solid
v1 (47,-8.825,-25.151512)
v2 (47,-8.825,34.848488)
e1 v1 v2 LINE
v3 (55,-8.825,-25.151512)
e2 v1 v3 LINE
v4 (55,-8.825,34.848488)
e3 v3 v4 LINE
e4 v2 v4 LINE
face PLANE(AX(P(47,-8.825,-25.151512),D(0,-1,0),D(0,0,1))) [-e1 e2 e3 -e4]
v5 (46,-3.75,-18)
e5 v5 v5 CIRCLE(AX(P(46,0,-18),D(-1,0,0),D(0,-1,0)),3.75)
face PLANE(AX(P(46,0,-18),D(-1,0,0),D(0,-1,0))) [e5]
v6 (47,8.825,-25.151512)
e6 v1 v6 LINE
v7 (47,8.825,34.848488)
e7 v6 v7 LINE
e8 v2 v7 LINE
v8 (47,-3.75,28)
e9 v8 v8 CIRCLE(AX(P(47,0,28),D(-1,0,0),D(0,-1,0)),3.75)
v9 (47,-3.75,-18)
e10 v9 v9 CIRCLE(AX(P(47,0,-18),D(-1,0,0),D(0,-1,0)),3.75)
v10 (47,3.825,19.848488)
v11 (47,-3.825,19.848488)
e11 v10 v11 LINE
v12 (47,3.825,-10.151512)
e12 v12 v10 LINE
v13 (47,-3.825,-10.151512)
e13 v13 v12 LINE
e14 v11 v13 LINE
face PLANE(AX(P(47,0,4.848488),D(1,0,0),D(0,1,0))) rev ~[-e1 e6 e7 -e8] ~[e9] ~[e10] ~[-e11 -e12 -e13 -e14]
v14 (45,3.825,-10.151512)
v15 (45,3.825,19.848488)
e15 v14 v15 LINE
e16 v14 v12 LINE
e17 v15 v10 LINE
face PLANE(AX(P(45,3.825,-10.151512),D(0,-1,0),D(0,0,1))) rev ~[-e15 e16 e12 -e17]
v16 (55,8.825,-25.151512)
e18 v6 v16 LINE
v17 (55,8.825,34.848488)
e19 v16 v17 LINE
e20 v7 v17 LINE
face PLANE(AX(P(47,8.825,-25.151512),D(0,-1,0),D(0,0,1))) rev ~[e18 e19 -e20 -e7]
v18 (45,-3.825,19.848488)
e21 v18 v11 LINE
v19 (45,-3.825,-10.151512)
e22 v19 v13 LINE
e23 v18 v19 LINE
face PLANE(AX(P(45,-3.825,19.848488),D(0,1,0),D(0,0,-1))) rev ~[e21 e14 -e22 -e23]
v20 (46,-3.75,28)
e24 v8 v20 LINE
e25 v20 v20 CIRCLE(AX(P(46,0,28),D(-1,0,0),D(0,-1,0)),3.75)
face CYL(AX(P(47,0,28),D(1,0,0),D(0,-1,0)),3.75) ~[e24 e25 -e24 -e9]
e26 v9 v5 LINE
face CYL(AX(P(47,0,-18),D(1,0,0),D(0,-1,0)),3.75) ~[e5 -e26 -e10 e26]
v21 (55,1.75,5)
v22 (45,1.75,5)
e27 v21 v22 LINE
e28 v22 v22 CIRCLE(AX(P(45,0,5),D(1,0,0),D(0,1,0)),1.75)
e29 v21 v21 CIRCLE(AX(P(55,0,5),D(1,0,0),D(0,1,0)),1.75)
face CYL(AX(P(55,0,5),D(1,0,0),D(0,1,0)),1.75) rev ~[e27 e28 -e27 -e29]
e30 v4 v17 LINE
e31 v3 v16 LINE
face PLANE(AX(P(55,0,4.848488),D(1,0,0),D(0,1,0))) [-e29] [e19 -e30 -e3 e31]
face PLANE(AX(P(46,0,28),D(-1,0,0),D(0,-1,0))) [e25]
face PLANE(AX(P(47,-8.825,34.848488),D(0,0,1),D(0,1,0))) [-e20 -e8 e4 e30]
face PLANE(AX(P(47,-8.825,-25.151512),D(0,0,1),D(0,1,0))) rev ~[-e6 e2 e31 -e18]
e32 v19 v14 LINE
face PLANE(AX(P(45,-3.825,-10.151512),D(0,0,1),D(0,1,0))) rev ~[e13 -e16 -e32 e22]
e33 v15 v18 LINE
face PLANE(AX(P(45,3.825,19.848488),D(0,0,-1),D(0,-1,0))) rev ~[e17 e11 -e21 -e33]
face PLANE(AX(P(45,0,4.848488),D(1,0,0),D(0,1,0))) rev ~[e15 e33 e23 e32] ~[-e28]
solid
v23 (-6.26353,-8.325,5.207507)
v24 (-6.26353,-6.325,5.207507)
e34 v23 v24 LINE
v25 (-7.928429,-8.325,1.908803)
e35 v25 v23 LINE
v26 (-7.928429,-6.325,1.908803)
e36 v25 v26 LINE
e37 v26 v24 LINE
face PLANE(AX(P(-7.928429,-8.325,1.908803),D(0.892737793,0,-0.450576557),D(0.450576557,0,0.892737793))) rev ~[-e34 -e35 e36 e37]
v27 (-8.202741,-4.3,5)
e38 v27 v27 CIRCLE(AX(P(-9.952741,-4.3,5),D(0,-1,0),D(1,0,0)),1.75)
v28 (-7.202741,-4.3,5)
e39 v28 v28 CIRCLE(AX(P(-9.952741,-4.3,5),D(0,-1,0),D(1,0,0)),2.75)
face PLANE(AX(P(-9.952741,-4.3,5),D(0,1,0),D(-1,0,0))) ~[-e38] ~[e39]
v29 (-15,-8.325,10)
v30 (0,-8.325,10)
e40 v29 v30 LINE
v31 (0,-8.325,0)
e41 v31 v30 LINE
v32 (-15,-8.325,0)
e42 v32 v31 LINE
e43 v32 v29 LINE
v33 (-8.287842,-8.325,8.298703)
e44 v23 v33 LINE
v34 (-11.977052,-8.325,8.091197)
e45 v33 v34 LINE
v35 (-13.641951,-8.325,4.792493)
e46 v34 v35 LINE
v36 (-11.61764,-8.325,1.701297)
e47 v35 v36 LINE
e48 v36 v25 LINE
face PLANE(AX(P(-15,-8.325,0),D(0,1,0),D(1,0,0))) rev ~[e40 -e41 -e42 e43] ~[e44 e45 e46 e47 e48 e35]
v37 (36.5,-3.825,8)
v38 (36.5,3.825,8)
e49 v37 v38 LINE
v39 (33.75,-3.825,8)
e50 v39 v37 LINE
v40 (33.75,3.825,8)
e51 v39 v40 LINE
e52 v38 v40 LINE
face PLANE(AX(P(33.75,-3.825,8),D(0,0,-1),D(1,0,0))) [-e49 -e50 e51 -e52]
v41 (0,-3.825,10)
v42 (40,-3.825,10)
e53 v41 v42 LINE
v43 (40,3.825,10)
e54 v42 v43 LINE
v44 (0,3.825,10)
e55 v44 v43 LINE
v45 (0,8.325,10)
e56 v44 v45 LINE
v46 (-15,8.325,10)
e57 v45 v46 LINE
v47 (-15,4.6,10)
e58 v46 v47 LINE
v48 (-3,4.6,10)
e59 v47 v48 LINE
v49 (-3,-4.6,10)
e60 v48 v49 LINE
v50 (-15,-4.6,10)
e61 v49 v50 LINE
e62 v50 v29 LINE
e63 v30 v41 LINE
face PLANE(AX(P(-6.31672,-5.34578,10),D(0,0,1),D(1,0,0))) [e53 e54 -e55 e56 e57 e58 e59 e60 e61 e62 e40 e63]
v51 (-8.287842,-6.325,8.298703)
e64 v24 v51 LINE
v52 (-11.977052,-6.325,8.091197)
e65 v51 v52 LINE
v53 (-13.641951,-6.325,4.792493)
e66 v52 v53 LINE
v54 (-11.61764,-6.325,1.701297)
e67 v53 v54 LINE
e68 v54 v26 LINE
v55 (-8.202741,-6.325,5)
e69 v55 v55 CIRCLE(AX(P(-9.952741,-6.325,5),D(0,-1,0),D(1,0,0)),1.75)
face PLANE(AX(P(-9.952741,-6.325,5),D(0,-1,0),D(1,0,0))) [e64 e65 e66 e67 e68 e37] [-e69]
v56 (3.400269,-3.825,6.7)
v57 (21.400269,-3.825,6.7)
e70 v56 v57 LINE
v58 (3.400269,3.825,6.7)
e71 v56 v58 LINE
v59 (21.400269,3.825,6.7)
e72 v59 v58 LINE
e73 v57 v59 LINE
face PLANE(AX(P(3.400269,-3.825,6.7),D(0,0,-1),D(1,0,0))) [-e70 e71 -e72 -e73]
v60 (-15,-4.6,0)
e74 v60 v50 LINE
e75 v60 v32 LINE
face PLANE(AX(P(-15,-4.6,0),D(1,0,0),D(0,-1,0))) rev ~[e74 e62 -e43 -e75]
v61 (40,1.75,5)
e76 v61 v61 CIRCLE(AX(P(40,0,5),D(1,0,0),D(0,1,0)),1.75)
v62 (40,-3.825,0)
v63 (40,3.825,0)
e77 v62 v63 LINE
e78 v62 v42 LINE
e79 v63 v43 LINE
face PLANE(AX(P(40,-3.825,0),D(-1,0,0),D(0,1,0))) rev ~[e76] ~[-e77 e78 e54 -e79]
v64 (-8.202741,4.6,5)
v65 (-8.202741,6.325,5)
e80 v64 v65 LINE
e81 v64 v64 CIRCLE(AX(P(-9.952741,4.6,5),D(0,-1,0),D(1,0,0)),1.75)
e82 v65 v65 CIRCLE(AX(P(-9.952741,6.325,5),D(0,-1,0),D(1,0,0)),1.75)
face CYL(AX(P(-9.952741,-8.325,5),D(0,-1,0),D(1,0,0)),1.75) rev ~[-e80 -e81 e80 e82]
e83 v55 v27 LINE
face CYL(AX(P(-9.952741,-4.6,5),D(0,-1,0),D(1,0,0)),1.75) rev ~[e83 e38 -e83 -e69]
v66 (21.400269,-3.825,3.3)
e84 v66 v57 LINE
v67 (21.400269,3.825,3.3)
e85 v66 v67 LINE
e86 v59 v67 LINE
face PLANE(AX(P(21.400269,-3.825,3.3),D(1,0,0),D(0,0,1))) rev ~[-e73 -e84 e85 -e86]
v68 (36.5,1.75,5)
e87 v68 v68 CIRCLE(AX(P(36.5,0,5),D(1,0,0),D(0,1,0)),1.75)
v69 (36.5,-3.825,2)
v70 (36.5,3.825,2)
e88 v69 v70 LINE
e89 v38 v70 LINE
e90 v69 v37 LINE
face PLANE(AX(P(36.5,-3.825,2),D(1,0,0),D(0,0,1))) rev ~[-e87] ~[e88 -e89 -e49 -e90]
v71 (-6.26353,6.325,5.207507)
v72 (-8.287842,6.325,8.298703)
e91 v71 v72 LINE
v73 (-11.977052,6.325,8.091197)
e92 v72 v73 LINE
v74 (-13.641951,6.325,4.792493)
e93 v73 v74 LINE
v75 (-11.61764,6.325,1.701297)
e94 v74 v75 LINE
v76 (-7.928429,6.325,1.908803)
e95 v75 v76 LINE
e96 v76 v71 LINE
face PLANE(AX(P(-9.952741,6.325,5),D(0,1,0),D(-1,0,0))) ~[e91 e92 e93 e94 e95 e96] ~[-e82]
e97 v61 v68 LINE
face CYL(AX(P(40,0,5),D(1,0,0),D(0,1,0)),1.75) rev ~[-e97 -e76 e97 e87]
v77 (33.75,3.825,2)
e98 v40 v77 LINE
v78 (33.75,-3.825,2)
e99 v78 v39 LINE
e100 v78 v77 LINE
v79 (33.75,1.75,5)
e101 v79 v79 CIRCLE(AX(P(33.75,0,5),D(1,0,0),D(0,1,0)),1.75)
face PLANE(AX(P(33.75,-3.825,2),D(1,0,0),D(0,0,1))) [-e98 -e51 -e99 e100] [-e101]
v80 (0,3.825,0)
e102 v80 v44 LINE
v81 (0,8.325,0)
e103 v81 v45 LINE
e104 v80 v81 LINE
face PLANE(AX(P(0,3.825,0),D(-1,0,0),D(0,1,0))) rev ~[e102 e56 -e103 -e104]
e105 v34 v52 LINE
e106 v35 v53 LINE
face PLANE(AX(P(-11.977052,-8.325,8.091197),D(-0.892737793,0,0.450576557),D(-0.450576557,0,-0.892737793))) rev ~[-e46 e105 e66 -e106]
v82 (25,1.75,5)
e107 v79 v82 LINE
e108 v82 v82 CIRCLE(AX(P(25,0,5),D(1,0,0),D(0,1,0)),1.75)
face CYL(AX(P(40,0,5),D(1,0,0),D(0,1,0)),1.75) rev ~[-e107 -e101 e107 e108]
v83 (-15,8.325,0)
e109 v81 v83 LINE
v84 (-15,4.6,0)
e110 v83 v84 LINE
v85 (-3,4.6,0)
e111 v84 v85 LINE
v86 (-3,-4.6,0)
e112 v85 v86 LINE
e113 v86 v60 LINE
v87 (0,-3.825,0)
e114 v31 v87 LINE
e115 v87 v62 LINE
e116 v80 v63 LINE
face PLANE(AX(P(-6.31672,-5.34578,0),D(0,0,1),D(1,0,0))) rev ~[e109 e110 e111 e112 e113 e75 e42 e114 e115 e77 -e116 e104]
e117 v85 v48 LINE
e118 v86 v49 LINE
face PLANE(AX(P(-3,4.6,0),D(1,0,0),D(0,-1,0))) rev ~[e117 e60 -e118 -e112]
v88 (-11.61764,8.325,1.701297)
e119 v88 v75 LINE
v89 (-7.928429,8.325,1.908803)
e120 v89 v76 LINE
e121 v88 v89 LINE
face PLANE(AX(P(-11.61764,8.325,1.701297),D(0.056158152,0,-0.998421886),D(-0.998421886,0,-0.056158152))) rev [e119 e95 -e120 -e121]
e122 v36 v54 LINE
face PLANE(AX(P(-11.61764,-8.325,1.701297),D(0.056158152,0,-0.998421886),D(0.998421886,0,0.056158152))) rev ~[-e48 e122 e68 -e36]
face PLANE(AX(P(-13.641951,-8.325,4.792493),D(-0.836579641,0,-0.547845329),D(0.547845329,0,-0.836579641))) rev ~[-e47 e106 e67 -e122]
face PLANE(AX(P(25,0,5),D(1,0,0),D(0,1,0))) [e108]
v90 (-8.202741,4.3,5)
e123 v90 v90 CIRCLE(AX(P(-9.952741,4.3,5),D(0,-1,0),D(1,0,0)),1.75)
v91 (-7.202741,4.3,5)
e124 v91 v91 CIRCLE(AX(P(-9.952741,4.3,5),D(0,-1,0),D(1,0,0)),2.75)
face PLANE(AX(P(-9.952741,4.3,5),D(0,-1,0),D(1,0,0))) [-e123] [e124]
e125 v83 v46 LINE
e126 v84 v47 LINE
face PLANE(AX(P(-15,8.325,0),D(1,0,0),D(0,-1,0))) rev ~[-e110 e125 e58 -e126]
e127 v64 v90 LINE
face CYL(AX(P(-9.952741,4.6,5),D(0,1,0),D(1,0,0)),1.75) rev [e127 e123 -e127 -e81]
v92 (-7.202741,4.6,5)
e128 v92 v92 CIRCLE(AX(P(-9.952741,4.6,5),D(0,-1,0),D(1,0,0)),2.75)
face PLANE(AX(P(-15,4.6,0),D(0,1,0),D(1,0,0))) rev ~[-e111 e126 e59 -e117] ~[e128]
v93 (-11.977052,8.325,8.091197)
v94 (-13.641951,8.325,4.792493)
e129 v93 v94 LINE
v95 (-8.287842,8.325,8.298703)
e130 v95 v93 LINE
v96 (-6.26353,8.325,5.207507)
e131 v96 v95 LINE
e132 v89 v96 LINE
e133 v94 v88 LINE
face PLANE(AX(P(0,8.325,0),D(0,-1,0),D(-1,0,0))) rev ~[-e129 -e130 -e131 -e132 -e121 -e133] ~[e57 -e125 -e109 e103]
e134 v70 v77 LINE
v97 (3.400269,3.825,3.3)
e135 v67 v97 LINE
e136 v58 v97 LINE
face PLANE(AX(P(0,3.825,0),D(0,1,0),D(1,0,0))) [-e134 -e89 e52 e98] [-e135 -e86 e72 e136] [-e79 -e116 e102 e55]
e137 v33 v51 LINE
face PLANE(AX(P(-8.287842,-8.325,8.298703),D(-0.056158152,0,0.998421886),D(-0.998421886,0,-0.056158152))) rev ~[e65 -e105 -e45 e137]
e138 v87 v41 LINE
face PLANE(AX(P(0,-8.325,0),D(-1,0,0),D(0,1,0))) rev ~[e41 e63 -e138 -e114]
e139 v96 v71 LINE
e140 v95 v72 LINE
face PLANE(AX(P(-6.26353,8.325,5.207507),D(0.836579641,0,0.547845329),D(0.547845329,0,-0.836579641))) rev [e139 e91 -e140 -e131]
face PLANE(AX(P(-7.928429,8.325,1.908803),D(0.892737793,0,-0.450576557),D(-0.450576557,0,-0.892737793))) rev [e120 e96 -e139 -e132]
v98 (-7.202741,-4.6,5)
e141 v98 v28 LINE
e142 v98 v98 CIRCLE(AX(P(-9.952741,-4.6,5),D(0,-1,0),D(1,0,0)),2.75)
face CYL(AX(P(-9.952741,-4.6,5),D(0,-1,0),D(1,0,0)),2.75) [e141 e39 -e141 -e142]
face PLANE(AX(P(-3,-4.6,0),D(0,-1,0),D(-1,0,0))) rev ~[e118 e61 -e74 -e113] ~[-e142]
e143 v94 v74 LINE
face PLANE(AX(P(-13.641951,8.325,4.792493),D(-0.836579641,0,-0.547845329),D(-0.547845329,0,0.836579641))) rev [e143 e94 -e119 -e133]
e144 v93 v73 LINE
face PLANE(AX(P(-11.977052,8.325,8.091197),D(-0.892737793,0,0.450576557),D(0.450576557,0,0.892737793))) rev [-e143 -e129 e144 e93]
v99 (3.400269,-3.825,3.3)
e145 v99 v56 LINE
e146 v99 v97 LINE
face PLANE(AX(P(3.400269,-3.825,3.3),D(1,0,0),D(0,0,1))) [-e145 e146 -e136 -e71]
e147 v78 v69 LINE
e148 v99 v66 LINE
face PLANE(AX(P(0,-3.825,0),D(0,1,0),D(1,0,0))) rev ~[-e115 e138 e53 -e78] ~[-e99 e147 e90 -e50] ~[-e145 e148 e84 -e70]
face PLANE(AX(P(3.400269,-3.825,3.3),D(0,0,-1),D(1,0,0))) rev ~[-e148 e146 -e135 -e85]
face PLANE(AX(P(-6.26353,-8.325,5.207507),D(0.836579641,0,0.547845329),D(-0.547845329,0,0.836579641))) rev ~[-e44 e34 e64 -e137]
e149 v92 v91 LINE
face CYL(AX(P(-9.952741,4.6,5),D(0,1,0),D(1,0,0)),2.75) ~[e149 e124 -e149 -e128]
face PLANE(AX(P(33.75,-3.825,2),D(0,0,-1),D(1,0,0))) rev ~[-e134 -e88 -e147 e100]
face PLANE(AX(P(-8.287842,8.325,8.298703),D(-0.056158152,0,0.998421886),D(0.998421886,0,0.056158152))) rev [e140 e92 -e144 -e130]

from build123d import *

# Parameters (mm, degrees)
F0_W      = 40
F0_H      = 3.825
F1_DEPTH  = 10
F2_R      = 1.75
F3_DEPTH  = 16.651
F4_W      = 18
F4_H      = 3.4
F4_W_2    = 2.75
F4_H_2    = 6
F5_DEPTH  = 12.151
F6_R      = 1.75
F7_DEPTH  = 15
F10_DEPTH = 2
F11_W     = 17.65
F11_H     = 60
F12_DEPTH = 8
F13_R     = 1.75
F14_DEPTH = 70.001
F15_R     = 2.75
F15_R_2   = 1.75
F16_DEPTH = 0.3
F17_R     = 1.75
F18_DEPTH = 2
F19_R     = 3.75
F20_DEPTH = 1


# Not quite as in the source:
# - a pattern or mirror of a feature is missing from the dataset's text; its kind, count and spacing are read off the source's solid


with BuildPart() as f1:
    # F0 (on Top) → F1 (new body)
    with BuildSketch(Plane.XY):
        Polygon((0, -3.825), (0, 0), (-3, 0), (-3, -4.6), (-15, -4.6), (-15, -8.325), (0, -8.325), align=None)
        Polygon((-3, 0), (0, 0), (0, 3.825), (0, 8.325), (-15, 8.325), (-15, 4.6), (-3, 4.6), align=None)
        with Locations((20, 1.9125)):
            Rectangle(F0_W, F0_H)
        with Locations((20, -1.9125)):
            Rectangle(F0_W, F0_H)
    extrude(amount=F1_DEPTH)

    # F2 (on face) → F3 (cut, through all)
    with BuildSketch(Plane.XZ.offset(8.325)):
        with Locations((-9.9527407438, 5)):
            Circle(F2_R)
    extrude(amount=-F3_DEPTH, mode=Mode.SUBTRACT)

    # F4 (on face) → F5 (cut, through all)
    with BuildSketch(Plane.XZ.offset(3.825)):
        with Locations((12.4002694301, 5)):
            Rectangle(F4_W, F4_H)
        with Locations((35.125, 5)):
            Rectangle(F4_W_2, F4_H_2)
    extrude(amount=-F5_DEPTH, mode=Mode.SUBTRACT)

    # F6 (on face) → F7 (cut)
    with BuildSketch(Plane.YZ.offset(40)):
        with Locations((0, 5)):
            Circle(F6_R)
    extrude(amount=-F7_DEPTH, mode=Mode.SUBTRACT)

    # F15 (on face) → F16 (join)
    with BuildSketch(Plane.XZ.offset(-4.6)):
        with Locations((-9.9527407438, 5)):
            Circle(F15_R)
        with Locations((-9.9527407438, 5)):
            Circle(F15_R_2, mode=Mode.SUBTRACT)
    f16 = extrude(amount=F16_DEPTH)

    # F16_copies: F16 across plane
    add(f16.mirror(Plane(origin=(0, 0, 0), x_dir=(0, 0, -1), z_dir=(0, -1, 0))))

    # F17 (on face) → F18 (cut)
    with BuildSketch(Plane.XZ.offset(8.325)):
        Polygon((-7.9284293953, 1.9088033227), (-6.2635302189, 5.2075067143), (-8.2878415673, 8.2987033916), (-11.9770520922, 8.0911966773), (-13.6419512686, 4.7924932857), (-11.6176399202, 1.7012966084), align=None)
        with Locations((-9.9527407438, 5)):
            Circle(F17_R, mode=Mode.SUBTRACT)
    f18 = extrude(amount=-F18_DEPTH, mode=Mode.SUBTRACT)

    # F18_copies: F18 across plane
    add(f18.mirror(Plane.ZX), mode=Mode.SUBTRACT)


with BuildPart() as f10:
    # F9 (on offset) → F10 (new body)
    with BuildSketch(Plane.YZ.offset(45)):
        Polygon((3.825, 0), (3.825, 10), (3.825, 19.8484882712), (-3.825, 19.8484882712), (-3.825, 10), (-3.825, 0), (-3.825, -10.1515117288), (3.825, -10.1515117288), align=None)
    extrude(amount=F10_DEPTH)

    # F11 (on face) → F12 (join)
    with BuildSketch(Plane.YZ.offset(47)):
        with Locations((0, 4.8484882712)):
            Rectangle(F11_W, F11_H)
    extrude(amount=F12_DEPTH)

    # F13 (on face) → F14 (cut, through all)
    with BuildSketch(Plane.YZ.offset(55)):
        with Locations((0, 5)):
            Circle(F13_R)
    extrude(amount=-F14_DEPTH, mode=Mode.SUBTRACT)

    # F19 (on face) → F20 (join)
    with BuildSketch(Plane(origin=(47, 0, 0), x_dir=(0, -1, 0), z_dir=(-1, 0, 0))):
        with Locations((0, 28)):
            Circle(F19_R)
        with Locations((0, -18)):
            Circle(F19_R)
    extrude(amount=F20_DEPTH)


solid = Compound([f1.part, f10.part])
